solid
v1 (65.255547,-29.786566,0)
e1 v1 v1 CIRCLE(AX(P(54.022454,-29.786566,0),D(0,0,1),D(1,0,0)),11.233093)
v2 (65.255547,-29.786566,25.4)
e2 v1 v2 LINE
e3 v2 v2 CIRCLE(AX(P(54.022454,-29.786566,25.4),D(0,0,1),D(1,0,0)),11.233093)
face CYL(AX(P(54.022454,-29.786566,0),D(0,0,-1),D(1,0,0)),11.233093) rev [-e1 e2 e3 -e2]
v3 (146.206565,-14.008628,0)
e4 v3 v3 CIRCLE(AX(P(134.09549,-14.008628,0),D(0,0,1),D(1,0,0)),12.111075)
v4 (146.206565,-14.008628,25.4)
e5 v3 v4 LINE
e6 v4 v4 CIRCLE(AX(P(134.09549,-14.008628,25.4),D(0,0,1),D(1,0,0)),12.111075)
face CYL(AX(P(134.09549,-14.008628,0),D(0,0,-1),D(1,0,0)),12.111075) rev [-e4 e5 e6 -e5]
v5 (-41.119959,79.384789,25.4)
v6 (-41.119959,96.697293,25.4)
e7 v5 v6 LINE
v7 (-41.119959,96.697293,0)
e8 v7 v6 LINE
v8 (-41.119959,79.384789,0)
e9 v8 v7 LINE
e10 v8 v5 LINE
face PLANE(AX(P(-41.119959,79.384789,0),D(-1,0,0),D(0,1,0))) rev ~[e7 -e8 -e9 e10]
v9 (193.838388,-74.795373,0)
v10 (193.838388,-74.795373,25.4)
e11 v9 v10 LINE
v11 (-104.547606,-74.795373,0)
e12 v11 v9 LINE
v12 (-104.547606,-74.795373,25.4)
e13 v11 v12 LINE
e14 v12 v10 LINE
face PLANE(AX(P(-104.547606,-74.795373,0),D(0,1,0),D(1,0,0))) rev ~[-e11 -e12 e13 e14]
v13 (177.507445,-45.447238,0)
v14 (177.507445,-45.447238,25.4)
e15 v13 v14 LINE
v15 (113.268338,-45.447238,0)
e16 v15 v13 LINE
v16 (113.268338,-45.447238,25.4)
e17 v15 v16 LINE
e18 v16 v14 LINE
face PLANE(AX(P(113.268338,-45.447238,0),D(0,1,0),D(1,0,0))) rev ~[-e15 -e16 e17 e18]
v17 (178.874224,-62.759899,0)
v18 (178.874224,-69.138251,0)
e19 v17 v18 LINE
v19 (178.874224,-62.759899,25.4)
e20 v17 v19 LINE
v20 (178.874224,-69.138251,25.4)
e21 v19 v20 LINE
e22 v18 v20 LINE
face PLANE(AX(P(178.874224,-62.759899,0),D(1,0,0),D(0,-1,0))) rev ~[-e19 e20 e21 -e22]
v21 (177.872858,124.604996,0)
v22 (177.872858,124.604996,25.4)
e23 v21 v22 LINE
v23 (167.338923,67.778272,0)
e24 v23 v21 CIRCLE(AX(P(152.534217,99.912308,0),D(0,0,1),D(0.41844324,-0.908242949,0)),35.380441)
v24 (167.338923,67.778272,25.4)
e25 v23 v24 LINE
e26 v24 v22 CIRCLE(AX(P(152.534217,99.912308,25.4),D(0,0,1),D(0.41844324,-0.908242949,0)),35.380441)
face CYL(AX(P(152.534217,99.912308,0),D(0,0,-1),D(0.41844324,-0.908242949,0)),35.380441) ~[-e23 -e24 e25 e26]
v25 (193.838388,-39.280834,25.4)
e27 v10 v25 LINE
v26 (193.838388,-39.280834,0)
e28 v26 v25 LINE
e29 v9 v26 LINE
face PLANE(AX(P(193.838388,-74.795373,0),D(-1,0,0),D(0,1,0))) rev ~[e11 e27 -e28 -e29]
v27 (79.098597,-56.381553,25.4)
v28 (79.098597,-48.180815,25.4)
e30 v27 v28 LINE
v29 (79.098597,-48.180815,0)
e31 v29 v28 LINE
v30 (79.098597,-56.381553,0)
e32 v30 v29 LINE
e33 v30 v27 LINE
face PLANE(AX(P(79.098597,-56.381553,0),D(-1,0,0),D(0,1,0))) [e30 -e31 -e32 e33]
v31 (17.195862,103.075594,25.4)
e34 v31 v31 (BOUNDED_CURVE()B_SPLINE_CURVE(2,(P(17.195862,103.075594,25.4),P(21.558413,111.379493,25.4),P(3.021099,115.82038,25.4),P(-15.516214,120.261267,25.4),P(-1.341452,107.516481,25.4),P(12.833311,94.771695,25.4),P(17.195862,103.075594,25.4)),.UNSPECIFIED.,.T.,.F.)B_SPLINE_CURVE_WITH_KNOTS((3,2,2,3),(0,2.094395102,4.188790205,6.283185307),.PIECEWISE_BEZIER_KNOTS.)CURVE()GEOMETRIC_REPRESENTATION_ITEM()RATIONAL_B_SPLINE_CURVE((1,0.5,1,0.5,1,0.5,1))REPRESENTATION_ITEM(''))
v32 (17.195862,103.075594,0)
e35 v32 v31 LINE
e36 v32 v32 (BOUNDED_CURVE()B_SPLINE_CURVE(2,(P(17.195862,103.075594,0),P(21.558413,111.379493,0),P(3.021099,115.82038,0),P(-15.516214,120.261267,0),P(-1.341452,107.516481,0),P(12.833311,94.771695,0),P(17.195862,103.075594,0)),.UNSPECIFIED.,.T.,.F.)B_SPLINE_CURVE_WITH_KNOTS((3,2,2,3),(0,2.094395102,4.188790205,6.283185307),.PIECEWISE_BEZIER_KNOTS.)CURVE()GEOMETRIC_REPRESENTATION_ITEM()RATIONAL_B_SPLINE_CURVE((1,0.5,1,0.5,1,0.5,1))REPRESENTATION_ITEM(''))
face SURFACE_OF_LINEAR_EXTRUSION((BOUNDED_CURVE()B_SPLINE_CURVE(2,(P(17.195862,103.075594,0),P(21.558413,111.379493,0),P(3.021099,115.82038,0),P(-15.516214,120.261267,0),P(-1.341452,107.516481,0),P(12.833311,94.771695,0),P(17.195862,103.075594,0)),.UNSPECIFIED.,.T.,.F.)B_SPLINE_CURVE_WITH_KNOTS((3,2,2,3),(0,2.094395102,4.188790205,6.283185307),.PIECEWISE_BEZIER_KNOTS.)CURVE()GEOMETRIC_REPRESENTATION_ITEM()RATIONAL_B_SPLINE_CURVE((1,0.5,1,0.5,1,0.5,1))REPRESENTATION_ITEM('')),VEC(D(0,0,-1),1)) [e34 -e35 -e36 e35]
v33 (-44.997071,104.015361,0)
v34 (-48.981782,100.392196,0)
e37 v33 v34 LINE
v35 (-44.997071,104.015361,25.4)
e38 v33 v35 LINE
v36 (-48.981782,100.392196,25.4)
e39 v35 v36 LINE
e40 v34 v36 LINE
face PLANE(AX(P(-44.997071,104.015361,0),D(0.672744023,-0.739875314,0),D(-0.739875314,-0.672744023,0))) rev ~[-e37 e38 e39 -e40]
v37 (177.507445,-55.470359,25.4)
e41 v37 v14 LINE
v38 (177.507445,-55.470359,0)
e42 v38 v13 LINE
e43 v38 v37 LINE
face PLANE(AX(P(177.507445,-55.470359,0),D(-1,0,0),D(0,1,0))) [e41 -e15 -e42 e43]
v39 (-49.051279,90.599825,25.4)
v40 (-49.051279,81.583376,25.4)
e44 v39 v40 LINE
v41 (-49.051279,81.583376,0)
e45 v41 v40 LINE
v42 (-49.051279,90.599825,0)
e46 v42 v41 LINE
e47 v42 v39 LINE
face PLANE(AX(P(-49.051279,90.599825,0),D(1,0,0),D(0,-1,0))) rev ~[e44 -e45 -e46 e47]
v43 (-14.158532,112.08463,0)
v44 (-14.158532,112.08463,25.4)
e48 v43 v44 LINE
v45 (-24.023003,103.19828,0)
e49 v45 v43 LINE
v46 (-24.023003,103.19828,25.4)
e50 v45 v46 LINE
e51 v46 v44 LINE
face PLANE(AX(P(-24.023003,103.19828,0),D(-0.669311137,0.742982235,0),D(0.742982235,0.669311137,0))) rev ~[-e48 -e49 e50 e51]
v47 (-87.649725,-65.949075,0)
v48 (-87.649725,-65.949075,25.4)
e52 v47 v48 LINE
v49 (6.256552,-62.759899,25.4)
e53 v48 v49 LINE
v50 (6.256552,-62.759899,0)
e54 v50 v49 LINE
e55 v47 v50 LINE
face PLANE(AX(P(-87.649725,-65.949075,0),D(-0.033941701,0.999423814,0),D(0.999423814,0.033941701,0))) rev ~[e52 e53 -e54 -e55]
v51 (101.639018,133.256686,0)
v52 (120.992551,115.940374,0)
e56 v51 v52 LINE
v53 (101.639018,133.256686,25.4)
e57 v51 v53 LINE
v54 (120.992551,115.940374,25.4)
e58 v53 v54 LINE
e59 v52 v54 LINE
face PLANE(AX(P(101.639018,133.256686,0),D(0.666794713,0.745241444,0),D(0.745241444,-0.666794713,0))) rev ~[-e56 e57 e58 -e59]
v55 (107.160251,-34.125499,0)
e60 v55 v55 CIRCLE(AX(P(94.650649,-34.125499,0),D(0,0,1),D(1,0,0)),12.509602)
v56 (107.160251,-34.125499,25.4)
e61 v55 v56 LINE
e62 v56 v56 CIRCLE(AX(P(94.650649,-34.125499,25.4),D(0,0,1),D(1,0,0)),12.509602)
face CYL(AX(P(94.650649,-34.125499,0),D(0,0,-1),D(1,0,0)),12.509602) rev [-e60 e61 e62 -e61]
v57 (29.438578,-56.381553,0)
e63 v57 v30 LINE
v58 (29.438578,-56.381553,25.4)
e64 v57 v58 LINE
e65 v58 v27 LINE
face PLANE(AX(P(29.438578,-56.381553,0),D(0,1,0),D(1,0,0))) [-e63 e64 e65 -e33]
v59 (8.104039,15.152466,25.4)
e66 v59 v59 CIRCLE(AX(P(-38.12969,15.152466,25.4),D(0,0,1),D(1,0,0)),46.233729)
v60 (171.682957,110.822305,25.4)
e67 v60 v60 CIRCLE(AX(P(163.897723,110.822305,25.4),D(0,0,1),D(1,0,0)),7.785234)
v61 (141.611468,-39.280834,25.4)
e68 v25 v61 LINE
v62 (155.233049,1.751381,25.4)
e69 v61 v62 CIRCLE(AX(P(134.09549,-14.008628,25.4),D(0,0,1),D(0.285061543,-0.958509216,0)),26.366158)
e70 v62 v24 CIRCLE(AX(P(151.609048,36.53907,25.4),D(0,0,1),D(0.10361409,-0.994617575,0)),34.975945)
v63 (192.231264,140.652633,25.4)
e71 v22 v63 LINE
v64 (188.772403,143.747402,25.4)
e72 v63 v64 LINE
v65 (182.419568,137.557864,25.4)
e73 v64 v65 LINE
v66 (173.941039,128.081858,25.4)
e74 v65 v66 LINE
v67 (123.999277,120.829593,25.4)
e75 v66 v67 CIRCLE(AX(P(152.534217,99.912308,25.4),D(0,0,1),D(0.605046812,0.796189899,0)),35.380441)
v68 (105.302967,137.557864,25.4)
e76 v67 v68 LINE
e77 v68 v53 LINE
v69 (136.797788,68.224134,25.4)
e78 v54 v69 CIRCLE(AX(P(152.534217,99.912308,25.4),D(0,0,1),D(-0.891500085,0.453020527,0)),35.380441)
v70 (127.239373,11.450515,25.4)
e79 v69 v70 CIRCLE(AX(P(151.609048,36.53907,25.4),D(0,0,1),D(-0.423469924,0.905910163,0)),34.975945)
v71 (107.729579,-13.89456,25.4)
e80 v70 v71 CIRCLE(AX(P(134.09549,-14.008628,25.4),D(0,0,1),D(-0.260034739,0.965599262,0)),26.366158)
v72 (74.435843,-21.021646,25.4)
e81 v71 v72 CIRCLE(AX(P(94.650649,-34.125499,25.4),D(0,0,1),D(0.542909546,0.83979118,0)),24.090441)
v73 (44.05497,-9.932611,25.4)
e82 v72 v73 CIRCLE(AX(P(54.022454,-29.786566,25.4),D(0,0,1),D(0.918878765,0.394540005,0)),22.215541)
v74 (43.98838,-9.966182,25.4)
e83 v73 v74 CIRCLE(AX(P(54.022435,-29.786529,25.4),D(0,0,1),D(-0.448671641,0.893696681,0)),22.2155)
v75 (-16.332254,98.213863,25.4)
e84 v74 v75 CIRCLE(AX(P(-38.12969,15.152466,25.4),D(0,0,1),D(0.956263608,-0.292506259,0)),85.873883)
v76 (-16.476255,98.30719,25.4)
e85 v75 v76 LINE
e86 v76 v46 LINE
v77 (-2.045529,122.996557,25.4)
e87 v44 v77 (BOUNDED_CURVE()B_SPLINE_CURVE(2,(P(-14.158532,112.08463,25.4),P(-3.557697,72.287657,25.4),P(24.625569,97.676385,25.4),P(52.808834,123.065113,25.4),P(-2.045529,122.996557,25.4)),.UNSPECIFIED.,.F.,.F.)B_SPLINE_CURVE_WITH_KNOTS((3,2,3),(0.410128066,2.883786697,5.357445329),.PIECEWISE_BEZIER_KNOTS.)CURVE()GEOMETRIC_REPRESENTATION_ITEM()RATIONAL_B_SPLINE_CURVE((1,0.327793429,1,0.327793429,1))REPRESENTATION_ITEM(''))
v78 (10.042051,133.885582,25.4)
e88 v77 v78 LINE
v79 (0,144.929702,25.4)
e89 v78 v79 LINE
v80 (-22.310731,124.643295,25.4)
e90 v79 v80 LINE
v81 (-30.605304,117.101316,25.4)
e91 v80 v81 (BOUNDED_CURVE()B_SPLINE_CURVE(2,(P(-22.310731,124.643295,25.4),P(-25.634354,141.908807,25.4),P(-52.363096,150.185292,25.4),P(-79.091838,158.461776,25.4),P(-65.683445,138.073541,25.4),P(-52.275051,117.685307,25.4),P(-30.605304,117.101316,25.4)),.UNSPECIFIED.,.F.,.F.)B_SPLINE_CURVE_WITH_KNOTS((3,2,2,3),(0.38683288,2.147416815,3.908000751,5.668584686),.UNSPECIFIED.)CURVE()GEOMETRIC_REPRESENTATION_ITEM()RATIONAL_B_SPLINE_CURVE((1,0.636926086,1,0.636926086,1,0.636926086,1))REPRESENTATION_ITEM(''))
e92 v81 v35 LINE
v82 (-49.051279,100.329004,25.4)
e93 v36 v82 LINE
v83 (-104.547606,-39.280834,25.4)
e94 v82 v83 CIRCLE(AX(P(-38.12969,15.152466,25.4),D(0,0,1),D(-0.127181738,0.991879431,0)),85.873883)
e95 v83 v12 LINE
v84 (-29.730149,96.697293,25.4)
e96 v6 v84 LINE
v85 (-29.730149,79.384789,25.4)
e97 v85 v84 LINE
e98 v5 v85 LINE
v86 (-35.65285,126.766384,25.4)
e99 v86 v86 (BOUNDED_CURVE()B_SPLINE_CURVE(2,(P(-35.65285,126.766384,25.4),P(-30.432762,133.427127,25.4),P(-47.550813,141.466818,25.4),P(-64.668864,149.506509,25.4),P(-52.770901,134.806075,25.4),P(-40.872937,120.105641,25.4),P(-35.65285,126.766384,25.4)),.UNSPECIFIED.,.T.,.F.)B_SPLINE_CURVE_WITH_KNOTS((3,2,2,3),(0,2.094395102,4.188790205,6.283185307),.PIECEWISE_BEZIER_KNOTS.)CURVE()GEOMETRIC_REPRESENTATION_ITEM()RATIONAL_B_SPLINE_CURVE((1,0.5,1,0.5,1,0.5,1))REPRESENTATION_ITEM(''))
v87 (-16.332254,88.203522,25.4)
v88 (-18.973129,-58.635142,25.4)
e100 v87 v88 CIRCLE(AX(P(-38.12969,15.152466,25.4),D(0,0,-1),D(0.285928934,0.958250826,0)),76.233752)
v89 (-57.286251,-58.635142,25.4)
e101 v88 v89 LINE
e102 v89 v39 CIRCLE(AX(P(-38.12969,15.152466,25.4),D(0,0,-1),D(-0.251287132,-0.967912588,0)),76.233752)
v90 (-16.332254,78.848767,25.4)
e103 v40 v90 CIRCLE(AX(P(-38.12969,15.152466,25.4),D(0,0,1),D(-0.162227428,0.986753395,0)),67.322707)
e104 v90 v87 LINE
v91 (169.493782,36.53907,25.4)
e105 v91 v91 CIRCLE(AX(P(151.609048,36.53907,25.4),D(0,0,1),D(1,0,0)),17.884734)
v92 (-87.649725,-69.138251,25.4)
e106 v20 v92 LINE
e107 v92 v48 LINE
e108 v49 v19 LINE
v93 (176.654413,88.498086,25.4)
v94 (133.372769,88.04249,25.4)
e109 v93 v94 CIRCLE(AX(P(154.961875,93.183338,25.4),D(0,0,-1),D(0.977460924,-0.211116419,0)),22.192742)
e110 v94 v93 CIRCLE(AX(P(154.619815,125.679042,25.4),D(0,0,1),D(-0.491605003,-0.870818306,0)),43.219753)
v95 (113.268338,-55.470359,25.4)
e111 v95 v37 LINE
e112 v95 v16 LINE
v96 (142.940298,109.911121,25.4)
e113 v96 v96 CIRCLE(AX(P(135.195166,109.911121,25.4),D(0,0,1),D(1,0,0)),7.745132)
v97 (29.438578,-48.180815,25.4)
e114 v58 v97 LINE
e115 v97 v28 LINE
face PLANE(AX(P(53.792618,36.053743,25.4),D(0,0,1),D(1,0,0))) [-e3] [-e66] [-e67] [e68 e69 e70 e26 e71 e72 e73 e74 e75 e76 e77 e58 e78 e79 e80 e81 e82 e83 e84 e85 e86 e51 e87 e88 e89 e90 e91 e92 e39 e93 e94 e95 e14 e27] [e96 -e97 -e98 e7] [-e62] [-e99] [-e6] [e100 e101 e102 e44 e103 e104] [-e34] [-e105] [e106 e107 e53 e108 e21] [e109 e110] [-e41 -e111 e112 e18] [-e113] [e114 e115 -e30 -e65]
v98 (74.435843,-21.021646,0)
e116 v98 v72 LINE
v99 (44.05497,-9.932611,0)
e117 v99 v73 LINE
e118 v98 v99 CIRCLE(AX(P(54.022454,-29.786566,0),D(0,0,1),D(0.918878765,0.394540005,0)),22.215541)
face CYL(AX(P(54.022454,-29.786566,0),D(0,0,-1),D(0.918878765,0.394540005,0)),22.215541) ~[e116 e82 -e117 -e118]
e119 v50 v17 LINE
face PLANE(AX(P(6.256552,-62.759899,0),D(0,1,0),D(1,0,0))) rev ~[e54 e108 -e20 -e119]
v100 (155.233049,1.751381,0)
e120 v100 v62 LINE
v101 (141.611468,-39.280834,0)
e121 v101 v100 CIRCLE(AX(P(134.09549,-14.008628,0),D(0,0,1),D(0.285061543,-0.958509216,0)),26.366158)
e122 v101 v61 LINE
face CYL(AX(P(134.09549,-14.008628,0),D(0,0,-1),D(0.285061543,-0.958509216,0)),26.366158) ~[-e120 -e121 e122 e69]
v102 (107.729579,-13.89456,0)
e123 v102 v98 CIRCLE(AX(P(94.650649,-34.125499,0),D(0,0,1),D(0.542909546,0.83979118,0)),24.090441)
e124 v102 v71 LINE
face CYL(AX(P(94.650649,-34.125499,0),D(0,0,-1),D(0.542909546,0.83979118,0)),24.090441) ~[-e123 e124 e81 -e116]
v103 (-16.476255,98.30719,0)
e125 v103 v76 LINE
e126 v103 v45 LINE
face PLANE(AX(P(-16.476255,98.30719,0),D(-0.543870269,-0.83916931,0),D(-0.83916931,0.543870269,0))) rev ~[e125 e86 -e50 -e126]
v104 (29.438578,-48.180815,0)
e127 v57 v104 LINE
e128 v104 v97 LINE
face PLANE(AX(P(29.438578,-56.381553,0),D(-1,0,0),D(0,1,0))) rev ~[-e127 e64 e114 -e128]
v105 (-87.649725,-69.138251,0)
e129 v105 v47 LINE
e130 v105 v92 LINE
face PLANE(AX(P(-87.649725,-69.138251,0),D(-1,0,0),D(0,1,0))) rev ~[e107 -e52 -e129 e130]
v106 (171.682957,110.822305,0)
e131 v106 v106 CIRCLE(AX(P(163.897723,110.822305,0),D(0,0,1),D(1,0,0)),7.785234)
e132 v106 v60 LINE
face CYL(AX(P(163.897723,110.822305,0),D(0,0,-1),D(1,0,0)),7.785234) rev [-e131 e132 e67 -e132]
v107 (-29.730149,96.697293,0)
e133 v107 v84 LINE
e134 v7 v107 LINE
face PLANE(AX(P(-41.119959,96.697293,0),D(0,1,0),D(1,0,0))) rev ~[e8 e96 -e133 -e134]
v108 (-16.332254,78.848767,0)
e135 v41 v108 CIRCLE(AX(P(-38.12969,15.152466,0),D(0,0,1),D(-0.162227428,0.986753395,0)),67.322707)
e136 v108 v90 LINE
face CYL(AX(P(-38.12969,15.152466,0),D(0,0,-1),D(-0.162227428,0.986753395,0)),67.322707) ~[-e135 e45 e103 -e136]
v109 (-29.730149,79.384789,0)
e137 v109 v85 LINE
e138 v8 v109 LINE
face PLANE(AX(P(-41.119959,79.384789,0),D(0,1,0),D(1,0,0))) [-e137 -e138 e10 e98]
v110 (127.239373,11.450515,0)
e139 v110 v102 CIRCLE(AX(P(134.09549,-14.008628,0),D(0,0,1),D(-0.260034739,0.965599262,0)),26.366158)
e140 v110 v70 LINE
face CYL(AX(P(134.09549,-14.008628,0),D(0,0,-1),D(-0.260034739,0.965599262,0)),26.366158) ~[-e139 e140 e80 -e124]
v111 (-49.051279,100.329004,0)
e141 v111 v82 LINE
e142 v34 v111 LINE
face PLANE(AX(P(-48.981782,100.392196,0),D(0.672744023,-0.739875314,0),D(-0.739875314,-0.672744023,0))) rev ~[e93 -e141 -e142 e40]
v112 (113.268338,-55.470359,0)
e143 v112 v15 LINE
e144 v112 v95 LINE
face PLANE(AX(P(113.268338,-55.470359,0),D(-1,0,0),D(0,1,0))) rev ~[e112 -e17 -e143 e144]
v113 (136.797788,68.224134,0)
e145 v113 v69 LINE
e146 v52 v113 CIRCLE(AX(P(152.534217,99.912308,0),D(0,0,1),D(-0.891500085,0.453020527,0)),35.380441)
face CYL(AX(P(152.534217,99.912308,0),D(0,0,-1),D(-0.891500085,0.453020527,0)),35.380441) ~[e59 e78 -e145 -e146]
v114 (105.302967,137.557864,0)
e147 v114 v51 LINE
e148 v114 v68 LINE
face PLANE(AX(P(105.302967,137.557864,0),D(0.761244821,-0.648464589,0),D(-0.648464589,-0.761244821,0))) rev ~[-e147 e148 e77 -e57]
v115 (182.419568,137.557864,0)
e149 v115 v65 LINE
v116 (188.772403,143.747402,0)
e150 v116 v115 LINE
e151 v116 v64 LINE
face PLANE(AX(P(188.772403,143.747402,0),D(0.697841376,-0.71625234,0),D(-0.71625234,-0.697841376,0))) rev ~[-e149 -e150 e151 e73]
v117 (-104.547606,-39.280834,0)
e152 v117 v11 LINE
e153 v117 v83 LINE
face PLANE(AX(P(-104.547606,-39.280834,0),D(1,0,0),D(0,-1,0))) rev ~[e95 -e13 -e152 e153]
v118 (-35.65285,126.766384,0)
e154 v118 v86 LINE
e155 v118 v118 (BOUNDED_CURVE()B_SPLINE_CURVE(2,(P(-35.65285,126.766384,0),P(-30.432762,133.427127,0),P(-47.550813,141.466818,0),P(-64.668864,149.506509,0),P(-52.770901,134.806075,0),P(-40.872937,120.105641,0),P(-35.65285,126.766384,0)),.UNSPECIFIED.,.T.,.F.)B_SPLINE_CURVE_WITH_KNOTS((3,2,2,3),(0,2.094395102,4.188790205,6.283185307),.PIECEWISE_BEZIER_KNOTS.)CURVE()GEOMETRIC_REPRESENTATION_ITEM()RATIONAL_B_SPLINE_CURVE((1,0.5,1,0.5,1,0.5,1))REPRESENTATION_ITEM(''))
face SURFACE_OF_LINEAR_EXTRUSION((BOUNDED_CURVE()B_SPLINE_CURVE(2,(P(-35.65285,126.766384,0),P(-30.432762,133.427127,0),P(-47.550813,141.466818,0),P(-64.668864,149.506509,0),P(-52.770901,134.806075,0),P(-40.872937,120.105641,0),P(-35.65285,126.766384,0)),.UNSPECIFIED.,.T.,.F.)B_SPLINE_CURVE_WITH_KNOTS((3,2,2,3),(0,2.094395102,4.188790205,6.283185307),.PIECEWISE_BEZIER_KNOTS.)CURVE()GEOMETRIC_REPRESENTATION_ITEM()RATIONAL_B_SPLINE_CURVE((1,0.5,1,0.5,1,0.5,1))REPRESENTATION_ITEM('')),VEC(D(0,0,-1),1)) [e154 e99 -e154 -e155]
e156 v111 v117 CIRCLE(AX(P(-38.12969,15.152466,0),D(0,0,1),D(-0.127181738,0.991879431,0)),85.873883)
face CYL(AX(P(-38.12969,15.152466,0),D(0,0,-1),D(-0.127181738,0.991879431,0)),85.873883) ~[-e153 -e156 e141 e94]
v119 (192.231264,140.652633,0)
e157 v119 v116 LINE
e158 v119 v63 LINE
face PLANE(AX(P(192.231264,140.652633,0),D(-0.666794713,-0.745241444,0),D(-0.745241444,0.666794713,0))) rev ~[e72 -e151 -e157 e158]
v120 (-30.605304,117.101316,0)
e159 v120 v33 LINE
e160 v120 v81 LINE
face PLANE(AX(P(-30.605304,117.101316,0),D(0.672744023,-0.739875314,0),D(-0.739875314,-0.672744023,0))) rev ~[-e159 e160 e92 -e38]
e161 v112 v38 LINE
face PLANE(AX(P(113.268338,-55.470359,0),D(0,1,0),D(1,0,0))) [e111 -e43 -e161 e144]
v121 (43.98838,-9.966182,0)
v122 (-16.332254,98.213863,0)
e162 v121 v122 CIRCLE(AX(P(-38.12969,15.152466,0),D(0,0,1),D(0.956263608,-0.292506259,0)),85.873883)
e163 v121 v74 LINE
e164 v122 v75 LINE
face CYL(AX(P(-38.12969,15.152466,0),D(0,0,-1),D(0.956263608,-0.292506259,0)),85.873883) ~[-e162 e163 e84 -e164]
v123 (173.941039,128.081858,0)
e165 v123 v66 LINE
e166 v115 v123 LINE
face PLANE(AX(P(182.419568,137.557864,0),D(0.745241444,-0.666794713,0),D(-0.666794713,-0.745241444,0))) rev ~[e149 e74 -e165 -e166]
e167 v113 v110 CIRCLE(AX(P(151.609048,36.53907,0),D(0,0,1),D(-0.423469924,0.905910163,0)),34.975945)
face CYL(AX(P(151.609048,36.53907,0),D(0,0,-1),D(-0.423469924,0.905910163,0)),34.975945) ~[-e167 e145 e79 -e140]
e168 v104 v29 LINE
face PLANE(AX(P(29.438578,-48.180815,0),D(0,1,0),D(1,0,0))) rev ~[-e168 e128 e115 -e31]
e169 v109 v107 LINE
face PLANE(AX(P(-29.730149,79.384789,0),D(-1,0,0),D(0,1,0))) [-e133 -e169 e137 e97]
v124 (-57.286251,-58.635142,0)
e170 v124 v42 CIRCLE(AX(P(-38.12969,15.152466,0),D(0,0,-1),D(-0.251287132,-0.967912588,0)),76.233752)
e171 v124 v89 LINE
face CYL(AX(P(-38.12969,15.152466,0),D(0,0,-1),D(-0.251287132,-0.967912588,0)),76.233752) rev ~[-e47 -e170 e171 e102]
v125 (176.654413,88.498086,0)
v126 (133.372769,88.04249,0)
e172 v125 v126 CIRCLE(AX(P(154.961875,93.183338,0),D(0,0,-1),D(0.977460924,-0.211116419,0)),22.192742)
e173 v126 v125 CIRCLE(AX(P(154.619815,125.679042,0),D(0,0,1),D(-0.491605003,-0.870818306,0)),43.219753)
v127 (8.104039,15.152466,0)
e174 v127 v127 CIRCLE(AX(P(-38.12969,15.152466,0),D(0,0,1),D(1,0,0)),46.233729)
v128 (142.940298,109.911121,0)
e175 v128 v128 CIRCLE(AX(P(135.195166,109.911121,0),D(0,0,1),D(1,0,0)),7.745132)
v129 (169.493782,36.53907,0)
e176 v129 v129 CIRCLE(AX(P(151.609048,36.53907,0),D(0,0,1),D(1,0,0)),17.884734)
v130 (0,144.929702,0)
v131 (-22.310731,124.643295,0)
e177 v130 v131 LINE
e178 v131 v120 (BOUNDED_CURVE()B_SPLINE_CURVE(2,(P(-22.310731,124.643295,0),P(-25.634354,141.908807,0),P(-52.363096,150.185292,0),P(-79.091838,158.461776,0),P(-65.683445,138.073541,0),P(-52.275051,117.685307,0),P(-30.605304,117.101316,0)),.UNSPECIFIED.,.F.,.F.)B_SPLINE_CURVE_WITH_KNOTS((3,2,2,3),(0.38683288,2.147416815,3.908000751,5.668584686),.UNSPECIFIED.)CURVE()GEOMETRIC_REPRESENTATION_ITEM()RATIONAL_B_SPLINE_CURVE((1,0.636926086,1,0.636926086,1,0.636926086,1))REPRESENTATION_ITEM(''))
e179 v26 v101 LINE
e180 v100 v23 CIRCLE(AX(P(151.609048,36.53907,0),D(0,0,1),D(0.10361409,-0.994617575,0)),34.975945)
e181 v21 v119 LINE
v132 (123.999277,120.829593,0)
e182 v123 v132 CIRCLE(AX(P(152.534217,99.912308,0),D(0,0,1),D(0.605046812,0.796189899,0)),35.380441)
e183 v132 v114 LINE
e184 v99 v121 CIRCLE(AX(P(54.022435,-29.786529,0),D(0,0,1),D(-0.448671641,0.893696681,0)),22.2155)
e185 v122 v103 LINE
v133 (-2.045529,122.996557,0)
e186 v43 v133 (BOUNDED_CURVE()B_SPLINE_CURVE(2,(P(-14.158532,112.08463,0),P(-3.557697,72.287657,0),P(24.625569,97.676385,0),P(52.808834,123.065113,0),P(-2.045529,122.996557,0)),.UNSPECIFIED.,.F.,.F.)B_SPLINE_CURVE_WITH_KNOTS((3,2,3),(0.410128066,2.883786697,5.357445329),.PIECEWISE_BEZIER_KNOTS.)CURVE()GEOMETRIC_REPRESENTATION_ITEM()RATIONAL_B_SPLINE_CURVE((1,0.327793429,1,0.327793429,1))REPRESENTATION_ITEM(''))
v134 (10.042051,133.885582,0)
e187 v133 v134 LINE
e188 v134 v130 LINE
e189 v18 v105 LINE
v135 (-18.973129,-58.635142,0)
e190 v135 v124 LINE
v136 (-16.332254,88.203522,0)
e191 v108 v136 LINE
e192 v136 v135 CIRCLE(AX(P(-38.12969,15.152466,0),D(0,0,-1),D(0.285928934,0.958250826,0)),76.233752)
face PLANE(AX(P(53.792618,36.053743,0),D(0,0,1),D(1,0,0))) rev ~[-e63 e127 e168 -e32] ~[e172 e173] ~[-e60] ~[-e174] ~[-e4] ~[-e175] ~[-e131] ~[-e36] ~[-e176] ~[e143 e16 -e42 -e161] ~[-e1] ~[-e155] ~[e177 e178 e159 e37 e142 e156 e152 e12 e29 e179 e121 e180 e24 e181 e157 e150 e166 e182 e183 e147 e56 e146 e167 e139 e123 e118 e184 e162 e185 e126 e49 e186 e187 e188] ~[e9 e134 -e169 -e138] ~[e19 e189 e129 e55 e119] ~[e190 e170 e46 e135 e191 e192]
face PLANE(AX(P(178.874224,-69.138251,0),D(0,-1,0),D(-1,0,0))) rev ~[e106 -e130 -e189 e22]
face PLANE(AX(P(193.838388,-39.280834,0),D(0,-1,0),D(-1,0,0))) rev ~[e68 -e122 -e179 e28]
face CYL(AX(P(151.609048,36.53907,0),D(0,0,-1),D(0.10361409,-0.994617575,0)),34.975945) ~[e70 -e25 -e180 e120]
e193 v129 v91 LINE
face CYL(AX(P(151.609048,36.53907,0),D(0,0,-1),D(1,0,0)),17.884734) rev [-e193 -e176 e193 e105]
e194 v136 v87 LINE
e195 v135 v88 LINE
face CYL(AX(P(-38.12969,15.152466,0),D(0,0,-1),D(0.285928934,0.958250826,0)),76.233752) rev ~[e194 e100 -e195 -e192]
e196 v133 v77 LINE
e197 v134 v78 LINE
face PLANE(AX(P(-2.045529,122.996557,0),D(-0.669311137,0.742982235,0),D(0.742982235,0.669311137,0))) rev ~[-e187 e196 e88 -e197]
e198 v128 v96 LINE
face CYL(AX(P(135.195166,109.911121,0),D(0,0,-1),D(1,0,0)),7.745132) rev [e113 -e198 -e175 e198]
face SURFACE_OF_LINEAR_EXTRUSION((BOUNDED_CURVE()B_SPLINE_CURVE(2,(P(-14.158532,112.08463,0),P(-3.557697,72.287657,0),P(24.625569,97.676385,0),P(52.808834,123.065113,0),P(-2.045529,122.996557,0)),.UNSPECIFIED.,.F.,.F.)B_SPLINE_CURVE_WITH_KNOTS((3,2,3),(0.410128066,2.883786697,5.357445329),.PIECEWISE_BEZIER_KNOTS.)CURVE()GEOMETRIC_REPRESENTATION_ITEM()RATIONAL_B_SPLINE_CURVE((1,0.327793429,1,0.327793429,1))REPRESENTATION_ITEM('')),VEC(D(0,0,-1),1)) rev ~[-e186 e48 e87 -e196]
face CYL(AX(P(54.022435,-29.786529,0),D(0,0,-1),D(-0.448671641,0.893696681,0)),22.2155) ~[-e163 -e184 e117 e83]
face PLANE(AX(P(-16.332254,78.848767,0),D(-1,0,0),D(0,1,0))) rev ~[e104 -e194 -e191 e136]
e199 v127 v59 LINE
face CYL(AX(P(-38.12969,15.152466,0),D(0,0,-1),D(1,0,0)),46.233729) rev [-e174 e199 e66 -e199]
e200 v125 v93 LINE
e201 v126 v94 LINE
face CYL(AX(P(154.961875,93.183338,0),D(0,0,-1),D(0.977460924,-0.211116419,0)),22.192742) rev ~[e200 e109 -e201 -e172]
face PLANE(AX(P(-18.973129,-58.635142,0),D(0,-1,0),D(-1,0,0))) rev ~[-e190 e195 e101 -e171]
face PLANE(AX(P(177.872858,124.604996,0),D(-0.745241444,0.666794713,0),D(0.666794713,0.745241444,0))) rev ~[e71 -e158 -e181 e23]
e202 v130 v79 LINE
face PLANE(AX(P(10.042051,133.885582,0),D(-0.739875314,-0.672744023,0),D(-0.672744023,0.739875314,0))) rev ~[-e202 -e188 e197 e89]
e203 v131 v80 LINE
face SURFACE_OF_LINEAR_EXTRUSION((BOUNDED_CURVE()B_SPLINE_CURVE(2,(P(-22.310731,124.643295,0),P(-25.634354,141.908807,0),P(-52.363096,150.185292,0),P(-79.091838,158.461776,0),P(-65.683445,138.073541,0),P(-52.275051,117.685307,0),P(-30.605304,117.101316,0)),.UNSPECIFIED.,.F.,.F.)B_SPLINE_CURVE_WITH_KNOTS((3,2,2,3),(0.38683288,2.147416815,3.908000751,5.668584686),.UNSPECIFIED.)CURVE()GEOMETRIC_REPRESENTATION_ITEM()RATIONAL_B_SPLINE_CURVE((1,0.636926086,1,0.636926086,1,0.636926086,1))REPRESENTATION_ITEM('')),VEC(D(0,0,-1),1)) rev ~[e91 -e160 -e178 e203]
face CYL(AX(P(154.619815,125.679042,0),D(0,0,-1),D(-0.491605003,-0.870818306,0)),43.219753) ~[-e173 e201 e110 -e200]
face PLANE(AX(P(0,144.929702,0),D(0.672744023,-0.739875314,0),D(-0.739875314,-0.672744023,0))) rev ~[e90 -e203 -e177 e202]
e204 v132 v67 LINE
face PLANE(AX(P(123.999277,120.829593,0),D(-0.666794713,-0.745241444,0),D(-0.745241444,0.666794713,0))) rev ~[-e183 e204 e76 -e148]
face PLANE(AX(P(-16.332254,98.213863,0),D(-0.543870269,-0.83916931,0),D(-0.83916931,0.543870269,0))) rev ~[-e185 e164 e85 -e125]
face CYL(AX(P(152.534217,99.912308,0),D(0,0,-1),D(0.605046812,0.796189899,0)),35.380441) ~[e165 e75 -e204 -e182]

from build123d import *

# Parameters (mm, degrees)
F0_R     = 46.2337285332
F0_W     = 49.6600195765
F0_H     = 8.200738579
F0_R_2   = 11.2330932007
F0_R_3   = 12.5096021804
F0_W_2   = 64.2391070724
F0_H_2   = 10.0231207907
F0_R_4   = 12.1110753235
F0_R_5   = 17.8847335495
F0_W_3   = 11.3898105919
F0_H_3   = 17.3125043511
F0_R_6   = 7.7451318502
F0_R_7   = 7.7852341734
F1_DEPTH = 25.4


# Not quite as in the source:
# - a feature names something its author has since deleted; it is built from what else it names


with BuildPart() as f1:
    # F0 (on Top) → F1 (new body)
    with BuildSketch(Plane.XY):
        with BuildLine():
            ThreePointArc((107.7295786753, -13.8945599229), (89.6079290098, -10.5687529062), (74.4358429591, -21.0216464664))
            ThreePointArc((74.4358429591, -21.0216464664), (61.6395998633, -8.9177051648), (44.054970235, -9.9326106946))
            ThreePointArc((44.054970235, -9.9326106946), (44.0216607871, -9.94936839), (43.9883795128, -9.9661819695))
            ThreePointArc((43.9883795128, -9.9661819695), (36.8725672934, 56.9733368671), (-16.332254, 98.2138625276))
            Line((-16.332254, 98.2138625276), (-16.4762551684, 98.307190481))
            Line((-16.4762551684, 98.307190481), (-24.0230032828, 103.1982796597))
            Line((-24.0230032828, 103.1982796597), (-14.1585315489, 112.0846304755))
            add(Edge.make_bspline(
                [(-14.1585315489, 112.0846304755), (-3.5576970286, 72.2876572961), (24.625568708, 97.676384967), (52.8088344446, 123.0651126378), (-2.0455294039, 122.9965565671)],
                knots=[0.4101280656, 0.4101280656, 0.4101280656, 2.8837866972, 2.8837866972, 5.3574453288, 5.3574453288, 5.3574453288], degree=2, weights=[1, 0.3277934292, 1, 0.3277934292, 1]))
            Line((-2.0455294039, 122.9965565671), (10.0420509966, 133.8855816309))
            Line((10.0420509966, 133.8855816309), (0, 144.9297015087))
            Line((0, 144.9297015087), (-22.3107314265, 124.6432952369))
            add(Edge.make_bspline(
                [(-22.3107314265, 124.6432952369), (-25.6343535574, 141.9088069841), (-52.3630960275, 150.1852915882), (-79.0918384976, 158.4617761923), (-65.6834446446, 138.0735414818), (-52.2750507915, 117.6853067713), (-30.6053039446, 117.1013162343)],
                knots=[0.3868328797, 0.3868328797, 0.3868328797, 2.1474168151, 2.1474168151, 3.9080007506, 3.9080007506, 5.6685846861, 5.6685846861, 5.6685846861], degree=2, weights=[1, 0.6369260862, 1, 0.6369260862, 1, 0.6369260862, 1]))
            Line((-30.6053039446, 117.1013162343), (-44.997071173, 104.0153608084))
            Line((-44.997071173, 104.0153608084), (-48.9817820908, 100.3921956594))
            Line((-48.9817820908, 100.3921956594), (-49.0512791846, 100.3290042627))
            ThreePointArc((-49.0512791846, 100.3290042627), (-117.9299183099, 46.8738666151), (-104.5476059195, -39.2808336848))
            Line((-104.5476059195, -39.2808336848), (-104.5476059195, -39.3657855206))
            Line((-104.5476059195, -39.3657855206), (-104.5476059195, -74.7953727841))
            Line((-104.5476059195, -74.7953727841), (193.8383877277, -74.7953727841))
            Line((193.8383877277, -74.7953727841), (193.8383877277, -39.2808336848))
            Line((193.8383877277, -39.2808336848), (141.6114676661, -39.2808336848))
            ThreePointArc((141.6114676661, -39.2808336848), (159.1188181407, -22.3156937595), (155.2330489218, 1.7513810711))
            ThreePointArc((155.2330489218, 1.7513810711), (186.0115295128, 30.2314569619), (167.3389228513, 67.7782724153))
            ThreePointArc((167.3389228513, 67.7782724153), (187.3220194013, 93.4637146547), (177.8728575709, 124.6049964436))
            Line((177.8728575709, 124.6049964436), (192.2312635884, 140.6526330346))
            Line((192.2312635884, 140.6526330346), (188.7724029248, 143.7474018801))
            Line((188.7724029248, 143.7474018801), (182.4195683002, 137.5578641892))
            Line((182.4195683002, 137.5578641892), (173.9410394456, 128.0818576101))
            ThreePointArc((173.9410394456, 128.0818576101), (147.4497947633, 134.9255089971), (123.9992773109, 120.8295932647))
            Line((123.9992773109, 120.8295932647), (105.3029671311, 137.5578641892))
            Line((105.3029671311, 137.5578641892), (101.6390184169, 133.2566856372))
            Line((101.6390184169, 133.2566856372), (120.9925508075, 115.9403740195))
            ThreePointArc((120.9925508075, 115.9403740195), (118.9482902232, 88.7875103825), (136.7977876196, 68.2241340128))
            ThreePointArc((136.7977876196, 68.2241340128), (117.1185074951, 42.3459026602), (127.2393729637, 11.4505145524))
            ThreePointArc((127.2393729637, 11.4505145524), (113.202453066, 2.0741358303), (107.7295786753, -13.8945599229))
        make_face()
        with Locations((-38.1296895495, 15.1524662187)):
            Circle(F0_R, mode=Mode.SUBTRACT)
        with BuildLine():
            Line((-16.332254, 82.0587446918), (-16.332254, 88.2035223783))
            ThreePointArc((-16.332254, 88.2035223783), (38.0917367076, 13.7816336616), (-18.9731285161, -58.635142307))
            Line((-18.9731285161, -58.635142307), (-57.2862505829, -58.635142307))
            ThreePointArc((-57.2862505829, -58.635142307), (-114.2476415826, 19.3527496442), (-49.0512791846, 90.5998245715))
            Line((-49.0512791846, 90.5998245715), (-49.0512791846, 84.6671925398))
            Line((-49.0512791846, 84.6671925398), (-49.0512791846, 81.5833761946))
            ThreePointArc((-49.0512791846, 81.5833761946), (-43.7368749443, -51.9363286157), (-16.332254, 78.8487669264))
            Line((-16.332254, 78.8487669264), (-16.332254, 82.0587446918))
        make_face(mode=Mode.SUBTRACT)
        Polygon((-87.6497253776, -65.949074924), (6.2565519474, -62.759898603), (178.8742244244, -62.759898603), (178.8742244244, -69.138251245), (-87.6497253776, -69.138251245), align=None, mode=Mode.SUBTRACT)
        with Locations((54.2685873806, -52.281184122)):
            Rectangle(F0_W, F0_H, mode=Mode.SUBTRACT)
        with Locations((54.0224537253, -29.7865662724)):
            Circle(F0_R_2, mode=Mode.SUBTRACT)
        with Locations((94.6506485343, -34.1254994273)):
            Circle(F0_R_3, mode=Mode.SUBTRACT)
        with Locations((145.38789168, -50.458798185)):
            Rectangle(F0_W_2, F0_H_2, mode=Mode.SUBTRACT)
        with Locations((134.0954899788, -14.0086282044)):
            Circle(F0_R_4, mode=Mode.SUBTRACT)
        with Locations((151.6090482473, 36.5390703082)):
            Circle(F0_R_5, mode=Mode.SUBTRACT)
        with Locations((-35.4250539094, 88.0410410464)):
            Rectangle(F0_W_3, F0_H_3, mode=Mode.SUBTRACT)
        with BuildLine():
            add(Edge.make_bspline(
                [(-35.6528498232, 126.7663836479), (-30.4327622591, 133.4271267378), (-47.5508131354, 141.4668180209), (-64.6688640118, 149.506509304), (-52.7709006996, 134.806074931), (-40.8729373874, 120.105640558), (-35.6528498232, 126.7663836479)],
                knots=[0, 0, 0, 2.0943951024, 2.0943951024, 4.1887902048, 4.1887902048, 6.2831853072, 6.2831853072, 6.2831853072], degree=2, weights=[1, 0.5, 1, 0.5, 1, 0.5, 1]))
        make_face(mode=Mode.SUBTRACT)
        with BuildLine():
            add(Edge.make_bspline(
                [(17.1958617866, 103.0755937099), (21.5584125472, 111.3794925705), (3.0210992372, 115.8203796991), (-15.5162140727, 120.2612668276), (-1.3414515233, 107.5164808385), (12.833311026, 94.7716948494), (17.1958617866, 103.0755937099)],
                knots=[0, 0, 0, 2.0943951024, 2.0943951024, 4.1887902048, 4.1887902048, 6.2831853072, 6.2831853072, 6.2831853072], degree=2, weights=[1, 0.5, 1, 0.5, 1, 0.5, 1]))
        make_face(mode=Mode.SUBTRACT)
        with BuildLine():
            ThreePointArc((176.6544133425, 88.4980857372), (155.1954693266, 70.9918250207), (133.3727687597, 88.0424901843))
            ThreePointArc((133.3727687597, 88.0424901843), (155.0747341605, 82.4616835644), (176.6544133425, 88.4980857372))
        make_face(mode=Mode.SUBTRACT)
        with Locations((135.1951658726, 109.911121428)):
            Circle(F0_R_6, mode=Mode.SUBTRACT)
        with Locations((163.8977229595, 110.8223050833)):
            Circle(F0_R_7, mode=Mode.SUBTRACT)
    extrude(amount=F1_DEPTH)


solid = f1.part
